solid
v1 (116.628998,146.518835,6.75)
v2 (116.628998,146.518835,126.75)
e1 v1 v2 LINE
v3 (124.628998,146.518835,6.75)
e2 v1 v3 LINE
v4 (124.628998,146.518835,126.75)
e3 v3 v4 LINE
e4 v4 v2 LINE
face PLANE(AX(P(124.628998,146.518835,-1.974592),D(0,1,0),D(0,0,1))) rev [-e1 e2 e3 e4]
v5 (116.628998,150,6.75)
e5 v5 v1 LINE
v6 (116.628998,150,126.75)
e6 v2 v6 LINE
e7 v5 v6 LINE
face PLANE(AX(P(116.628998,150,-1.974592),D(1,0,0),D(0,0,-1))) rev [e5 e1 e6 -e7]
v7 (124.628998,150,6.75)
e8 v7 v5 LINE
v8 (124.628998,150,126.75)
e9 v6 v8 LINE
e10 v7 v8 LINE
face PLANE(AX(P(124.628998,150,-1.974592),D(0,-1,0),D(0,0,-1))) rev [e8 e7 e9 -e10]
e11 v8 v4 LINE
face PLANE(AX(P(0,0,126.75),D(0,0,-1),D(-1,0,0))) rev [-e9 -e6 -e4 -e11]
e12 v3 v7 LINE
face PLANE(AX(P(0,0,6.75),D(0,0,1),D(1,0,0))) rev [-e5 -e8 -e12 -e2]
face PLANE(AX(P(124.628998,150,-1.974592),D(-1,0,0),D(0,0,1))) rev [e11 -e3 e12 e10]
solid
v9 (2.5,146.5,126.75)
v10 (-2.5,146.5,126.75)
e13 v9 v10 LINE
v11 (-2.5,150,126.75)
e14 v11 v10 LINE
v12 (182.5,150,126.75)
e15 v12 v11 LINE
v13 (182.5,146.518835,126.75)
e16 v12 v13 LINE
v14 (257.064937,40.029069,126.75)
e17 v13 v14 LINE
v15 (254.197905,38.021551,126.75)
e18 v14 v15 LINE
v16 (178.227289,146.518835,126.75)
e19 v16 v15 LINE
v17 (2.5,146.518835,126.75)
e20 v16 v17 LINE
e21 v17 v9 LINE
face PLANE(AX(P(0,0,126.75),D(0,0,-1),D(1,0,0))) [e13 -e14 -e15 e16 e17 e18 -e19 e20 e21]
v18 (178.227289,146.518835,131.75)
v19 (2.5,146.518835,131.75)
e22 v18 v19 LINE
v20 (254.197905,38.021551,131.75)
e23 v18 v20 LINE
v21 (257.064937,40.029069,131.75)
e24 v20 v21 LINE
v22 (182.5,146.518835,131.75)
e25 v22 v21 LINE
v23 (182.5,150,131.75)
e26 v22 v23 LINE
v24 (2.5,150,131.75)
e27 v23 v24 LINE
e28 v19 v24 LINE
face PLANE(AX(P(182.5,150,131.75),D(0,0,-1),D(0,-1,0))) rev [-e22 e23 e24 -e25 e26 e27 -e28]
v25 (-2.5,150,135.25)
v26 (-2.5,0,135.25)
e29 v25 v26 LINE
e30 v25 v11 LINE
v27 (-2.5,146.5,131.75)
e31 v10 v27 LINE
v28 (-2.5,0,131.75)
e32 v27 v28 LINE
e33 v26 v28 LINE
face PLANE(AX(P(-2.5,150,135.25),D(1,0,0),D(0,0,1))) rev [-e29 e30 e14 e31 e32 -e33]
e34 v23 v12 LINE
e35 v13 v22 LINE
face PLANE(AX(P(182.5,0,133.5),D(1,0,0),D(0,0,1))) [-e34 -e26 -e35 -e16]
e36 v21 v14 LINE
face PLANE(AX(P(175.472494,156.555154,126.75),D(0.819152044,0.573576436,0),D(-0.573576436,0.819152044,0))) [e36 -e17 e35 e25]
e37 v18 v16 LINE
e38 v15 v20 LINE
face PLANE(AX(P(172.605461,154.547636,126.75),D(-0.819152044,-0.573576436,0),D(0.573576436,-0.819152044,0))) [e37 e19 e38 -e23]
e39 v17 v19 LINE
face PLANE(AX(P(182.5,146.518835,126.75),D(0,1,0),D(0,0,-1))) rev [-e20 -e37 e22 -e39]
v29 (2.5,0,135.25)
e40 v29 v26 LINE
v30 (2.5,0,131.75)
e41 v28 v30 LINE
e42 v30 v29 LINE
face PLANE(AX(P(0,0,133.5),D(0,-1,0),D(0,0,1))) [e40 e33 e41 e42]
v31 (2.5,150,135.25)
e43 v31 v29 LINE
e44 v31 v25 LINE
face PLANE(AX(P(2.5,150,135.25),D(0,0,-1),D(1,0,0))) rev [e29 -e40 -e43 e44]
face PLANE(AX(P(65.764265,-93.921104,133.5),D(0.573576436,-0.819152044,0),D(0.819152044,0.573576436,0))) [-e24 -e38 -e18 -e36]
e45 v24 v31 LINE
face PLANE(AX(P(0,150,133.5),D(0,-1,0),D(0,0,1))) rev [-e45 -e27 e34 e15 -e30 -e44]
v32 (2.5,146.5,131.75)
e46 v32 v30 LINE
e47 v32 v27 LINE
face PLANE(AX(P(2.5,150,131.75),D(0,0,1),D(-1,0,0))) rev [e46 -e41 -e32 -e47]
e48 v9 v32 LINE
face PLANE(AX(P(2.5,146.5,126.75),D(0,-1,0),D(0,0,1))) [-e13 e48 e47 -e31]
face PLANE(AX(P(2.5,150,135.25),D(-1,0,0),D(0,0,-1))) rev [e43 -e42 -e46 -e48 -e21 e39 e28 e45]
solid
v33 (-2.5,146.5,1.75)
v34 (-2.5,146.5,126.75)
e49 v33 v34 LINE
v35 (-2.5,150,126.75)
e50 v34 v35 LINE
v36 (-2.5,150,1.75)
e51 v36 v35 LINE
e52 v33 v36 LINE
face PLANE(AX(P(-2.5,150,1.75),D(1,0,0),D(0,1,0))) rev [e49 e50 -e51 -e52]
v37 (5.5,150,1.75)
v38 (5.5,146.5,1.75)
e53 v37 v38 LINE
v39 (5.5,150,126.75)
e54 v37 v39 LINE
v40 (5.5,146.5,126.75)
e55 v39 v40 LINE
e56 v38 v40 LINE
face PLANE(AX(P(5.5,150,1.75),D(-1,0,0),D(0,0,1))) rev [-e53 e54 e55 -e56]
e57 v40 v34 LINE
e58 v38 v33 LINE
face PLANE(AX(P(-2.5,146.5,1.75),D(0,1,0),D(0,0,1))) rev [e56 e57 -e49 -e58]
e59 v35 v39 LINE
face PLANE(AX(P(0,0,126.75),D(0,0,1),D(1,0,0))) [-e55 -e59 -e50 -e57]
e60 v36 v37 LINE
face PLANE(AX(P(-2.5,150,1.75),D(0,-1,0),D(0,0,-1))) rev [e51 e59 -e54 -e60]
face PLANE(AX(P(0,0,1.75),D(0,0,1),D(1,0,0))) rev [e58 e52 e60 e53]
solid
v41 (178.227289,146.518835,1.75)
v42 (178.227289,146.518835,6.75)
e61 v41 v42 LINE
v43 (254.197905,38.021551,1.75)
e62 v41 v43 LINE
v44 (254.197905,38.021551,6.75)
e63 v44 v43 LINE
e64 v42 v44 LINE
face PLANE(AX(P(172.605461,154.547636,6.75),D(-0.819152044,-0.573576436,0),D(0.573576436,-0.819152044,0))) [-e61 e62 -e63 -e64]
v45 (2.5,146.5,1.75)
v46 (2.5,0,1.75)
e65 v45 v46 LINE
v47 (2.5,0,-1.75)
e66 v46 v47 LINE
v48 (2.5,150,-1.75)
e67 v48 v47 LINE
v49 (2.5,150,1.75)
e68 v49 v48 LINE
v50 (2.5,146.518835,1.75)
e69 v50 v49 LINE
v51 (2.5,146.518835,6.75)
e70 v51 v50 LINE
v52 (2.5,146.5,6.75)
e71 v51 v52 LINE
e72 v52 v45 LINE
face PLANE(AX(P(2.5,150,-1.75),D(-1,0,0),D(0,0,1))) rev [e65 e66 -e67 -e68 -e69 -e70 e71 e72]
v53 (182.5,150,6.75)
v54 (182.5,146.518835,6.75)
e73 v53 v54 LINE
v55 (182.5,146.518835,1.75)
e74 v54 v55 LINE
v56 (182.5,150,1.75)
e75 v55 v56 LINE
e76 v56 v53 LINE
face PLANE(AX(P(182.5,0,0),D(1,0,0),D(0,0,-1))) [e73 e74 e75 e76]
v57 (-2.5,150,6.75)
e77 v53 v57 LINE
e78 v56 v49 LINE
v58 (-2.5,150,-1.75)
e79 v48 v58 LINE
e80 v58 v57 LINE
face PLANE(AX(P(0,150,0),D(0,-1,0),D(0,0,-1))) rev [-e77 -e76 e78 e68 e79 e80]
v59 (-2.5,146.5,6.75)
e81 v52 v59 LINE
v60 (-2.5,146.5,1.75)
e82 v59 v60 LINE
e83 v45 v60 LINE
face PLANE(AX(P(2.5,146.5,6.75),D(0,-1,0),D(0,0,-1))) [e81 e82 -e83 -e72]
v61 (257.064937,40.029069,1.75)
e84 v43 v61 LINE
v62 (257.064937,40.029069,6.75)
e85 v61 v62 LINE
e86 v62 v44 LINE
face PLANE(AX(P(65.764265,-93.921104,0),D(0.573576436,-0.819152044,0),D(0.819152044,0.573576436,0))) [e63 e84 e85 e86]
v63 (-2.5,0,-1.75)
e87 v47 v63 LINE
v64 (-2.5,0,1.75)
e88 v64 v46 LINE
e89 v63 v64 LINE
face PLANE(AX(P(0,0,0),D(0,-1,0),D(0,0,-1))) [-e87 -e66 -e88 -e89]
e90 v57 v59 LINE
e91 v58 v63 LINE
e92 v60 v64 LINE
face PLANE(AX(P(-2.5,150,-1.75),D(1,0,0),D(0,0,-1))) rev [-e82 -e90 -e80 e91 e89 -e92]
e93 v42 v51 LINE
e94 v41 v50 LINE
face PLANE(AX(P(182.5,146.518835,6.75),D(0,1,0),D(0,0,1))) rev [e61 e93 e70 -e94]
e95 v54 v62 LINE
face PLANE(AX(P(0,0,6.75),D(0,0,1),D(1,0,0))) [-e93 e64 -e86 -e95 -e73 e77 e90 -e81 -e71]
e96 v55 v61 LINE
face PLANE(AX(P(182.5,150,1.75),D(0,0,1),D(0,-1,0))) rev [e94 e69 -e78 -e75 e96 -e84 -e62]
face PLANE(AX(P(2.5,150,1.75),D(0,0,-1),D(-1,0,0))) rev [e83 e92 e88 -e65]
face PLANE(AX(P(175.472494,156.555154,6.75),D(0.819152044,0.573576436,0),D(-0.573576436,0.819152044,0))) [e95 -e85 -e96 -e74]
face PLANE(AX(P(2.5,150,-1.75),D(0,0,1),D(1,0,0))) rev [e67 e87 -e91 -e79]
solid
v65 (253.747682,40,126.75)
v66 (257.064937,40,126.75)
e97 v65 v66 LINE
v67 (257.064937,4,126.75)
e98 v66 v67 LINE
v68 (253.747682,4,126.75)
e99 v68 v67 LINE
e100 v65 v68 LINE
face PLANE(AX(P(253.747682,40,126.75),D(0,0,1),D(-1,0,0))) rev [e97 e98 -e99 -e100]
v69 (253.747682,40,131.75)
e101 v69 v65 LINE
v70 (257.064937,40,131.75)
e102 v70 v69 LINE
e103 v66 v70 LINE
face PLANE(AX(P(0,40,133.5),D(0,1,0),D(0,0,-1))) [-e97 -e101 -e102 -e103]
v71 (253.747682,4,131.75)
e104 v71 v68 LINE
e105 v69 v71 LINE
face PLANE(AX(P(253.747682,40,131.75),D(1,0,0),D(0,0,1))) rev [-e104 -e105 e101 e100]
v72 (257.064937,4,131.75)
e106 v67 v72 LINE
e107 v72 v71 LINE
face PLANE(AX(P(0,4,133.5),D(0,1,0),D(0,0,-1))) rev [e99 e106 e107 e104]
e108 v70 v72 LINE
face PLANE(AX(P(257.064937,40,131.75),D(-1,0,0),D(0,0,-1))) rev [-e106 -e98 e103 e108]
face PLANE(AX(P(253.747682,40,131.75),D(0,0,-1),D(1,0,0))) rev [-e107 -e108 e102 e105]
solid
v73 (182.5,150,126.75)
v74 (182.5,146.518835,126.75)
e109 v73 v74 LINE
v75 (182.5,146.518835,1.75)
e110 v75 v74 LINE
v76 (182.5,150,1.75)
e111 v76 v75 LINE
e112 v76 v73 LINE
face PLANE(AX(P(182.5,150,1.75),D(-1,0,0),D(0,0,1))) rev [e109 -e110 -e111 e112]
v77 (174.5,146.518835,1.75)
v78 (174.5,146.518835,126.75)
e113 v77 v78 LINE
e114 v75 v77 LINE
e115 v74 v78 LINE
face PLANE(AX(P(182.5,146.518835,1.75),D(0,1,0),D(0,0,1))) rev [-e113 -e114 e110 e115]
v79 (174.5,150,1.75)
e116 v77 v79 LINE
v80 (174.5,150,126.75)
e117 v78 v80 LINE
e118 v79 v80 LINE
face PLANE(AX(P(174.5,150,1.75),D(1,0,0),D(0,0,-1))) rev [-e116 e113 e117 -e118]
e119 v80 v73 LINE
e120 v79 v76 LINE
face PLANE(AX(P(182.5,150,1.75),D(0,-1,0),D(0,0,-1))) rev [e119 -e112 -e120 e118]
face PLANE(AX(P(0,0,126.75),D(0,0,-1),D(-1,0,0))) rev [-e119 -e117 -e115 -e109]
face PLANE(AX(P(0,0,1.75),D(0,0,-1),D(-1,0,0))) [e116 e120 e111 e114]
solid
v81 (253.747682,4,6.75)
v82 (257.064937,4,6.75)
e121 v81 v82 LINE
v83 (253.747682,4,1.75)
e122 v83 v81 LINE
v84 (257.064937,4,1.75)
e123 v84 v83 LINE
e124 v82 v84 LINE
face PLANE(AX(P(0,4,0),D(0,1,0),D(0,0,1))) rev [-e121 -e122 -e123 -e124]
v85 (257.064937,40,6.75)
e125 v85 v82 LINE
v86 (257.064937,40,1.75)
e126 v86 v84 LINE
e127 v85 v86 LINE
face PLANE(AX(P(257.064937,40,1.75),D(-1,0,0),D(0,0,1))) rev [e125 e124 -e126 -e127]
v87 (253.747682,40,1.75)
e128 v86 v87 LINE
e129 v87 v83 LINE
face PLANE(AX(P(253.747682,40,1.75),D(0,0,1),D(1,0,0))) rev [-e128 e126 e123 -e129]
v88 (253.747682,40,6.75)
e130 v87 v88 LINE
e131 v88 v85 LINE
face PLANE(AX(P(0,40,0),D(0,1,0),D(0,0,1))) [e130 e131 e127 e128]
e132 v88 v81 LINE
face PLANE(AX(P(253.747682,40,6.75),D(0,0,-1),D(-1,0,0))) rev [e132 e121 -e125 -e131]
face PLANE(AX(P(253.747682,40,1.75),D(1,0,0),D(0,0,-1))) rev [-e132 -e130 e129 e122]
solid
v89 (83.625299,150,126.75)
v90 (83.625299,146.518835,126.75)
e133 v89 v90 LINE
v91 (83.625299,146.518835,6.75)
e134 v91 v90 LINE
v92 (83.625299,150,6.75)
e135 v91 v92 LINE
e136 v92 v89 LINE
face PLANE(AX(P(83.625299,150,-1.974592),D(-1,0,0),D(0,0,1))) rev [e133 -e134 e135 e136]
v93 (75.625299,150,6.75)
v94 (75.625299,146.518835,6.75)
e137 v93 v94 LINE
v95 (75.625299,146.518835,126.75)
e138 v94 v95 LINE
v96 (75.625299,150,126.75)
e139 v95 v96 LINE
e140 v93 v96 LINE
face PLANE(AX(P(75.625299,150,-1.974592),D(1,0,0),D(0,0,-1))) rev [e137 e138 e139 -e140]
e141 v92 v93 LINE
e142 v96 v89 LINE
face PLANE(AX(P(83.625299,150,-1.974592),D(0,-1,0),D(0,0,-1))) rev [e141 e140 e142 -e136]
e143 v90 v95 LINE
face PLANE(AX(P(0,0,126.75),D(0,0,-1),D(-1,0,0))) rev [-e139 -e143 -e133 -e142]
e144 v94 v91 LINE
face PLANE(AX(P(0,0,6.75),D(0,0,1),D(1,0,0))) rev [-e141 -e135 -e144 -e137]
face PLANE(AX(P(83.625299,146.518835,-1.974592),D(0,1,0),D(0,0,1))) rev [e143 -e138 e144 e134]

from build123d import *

# Parameters (mm, degrees)
SKETCH2_W                       = 5
SKETCH2_H                       = 3.5
BOSS_EXTRUDE1_DEPTH             = 150
SKETCH5_W                       = 5
SKETCH5_H                       = 3.5
BOSS_EXTRUDE2_DEPTH             = 5
SKETCH7_W                       = 5
SKETCH7_H                       = 3.481165415
BOSS_EXTRUDE3_DEPTH             = 180
SKETCH11_W                      = 5
SKETCH11_H                      = 3.5
BOSS_EXTRUDE4_DEPTH             = 130
BOSS_EXTRUDE4_DIRECTION_2_REACH = 237.646
BOSS_EXTRUDE14_DEPTH            = 6
BOSS_EXTRUDE14_DEPTH_BACK       = 30
SKETCH23_W                      = 3.317254227
SKETCH23_H                      = 5
MIRROR7_START                   = 126.75
MIRROR7_DEPTH                   = 5
MIRROR7_START_2                 = 131.75
MIRROR7_2_OUTLINE_W             = 5
MIRROR7_2_OUTLINE_H             = 150
MIRROR7_2_DEPTH                 = 3.5
SKETCH26_W                      = 8
SKETCH26_H                      = 3.481165415
BOSS_EXTRUDE16_DEPTH            = 125
SKETCH30_W                      = 8
SKETCH30_H                      = 3.481165415
BOSS_EXTRUDE22_DEPTH            = 120
SKETCH31_W                      = 8
SKETCH31_H                      = 3.481165415
BOSS_EXTRUDE23_DEPTH            = 120
SKETCH29_W                      = 8
SKETCH29_H                      = 3.5
BOSS_EXTRUDE26_DEPTH            = 125


# Read off the part's stored shape, not the designer's step: Mirror7
with BuildPart() as part:
    # Sketch2 → Boss-Extrude1 (new body)
    with BuildSketch(Plane(origin=(0, 0, 0), x_dir=(1, 0, 0), z_dir=(0, 1, 0))):
        Rectangle(SKETCH2_W, SKETCH2_H)
    extrude(amount=BOSS_EXTRUDE1_DEPTH)

    # Sketch5 → Boss-Extrude2 (add)
    with BuildSketch(Plane.XY.offset(1.75)):
        with Locations((0, 148.25)):
            Rectangle(SKETCH5_W, SKETCH5_H)
    extrude(amount=BOSS_EXTRUDE2_DEPTH)

    # Sketch7 → Boss-Extrude3 (add)
    with BuildSketch(Plane(origin=(2.5, 0, 0), x_dir=(0, 0, -1), z_dir=(1, 0, 0))):
        with Locations((-4.25, 148.259417293)):
            Rectangle(SKETCH7_W, SKETCH7_H)
    extrude(amount=BOSS_EXTRUDE3_DEPTH)

    # Sketch11 → Boss-Extrude4 (add)
    with BuildSketch(Plane(origin=(-8.800671911, 12.568662048, 0), x_dir=(0, 0, -1), z_dir=(0.5735764363510444, -0.819152044288993, 0))):
        with Locations((-4.25, 231.784999082)):
            Rectangle(SKETCH11_W, SKETCH11_H)
    extrude(amount=BOSS_EXTRUDE4_DEPTH)

    # Boss-Extrude4 direction 2: up to this face of the body (flat: up to its plane)
    boss_extrude4_direction_2_end = Plane(part.part.faces().sort_by_distance((88.328912467, 150, 4.171087533))[0])
    # Sketch11 → Boss-Extrude4 direction 2 (add, up to the picked face)
    with BuildSketch(Plane(origin=(-8.800671911, 12.568662048, 0), x_dir=(0, 0, -1), z_dir=(0.5735764363510444, -0.819152044288993, 0)), mode=Mode.PRIVATE) as boss_extrude4_direction_2_sk1:
        with Locations((-4.25, 231.784999082)):
            Rectangle(SKETCH11_W, SKETCH11_H)
    boss_extrude4_direction_2_tool1 = split(extrude(boss_extrude4_direction_2_sk1.sketch, amount=-BOSS_EXTRUDE4_DIRECTION_2_REACH, mode=Mode.PRIVATE), bisect_by=boss_extrude4_direction_2_end, keep=Keep.BOTH, mode=Mode.PRIVATE)
    add(boss_extrude4_direction_2_tool1.solids().sort_by(Axis((181.066484, 145.515076, 4.25), (-0.5735764363510444, 0.819152044288993, 0)))[0])


with BuildPart() as body_2:
    # Sketch23 → Boss-Extrude14 (new, two sides: drawn at the far end of the back side and taken through both)
    with BuildSketch(Plane(origin=(0, 34, 0), x_dir=(1, 0, 0), z_dir=(0, 1, 0)).offset(-BOSS_EXTRUDE14_DEPTH_BACK)):
        with Locations((255.406309613, -4.25)):
            Rectangle(SKETCH23_W, SKETCH23_H)
    extrude(amount=BOSS_EXTRUDE14_DEPTH + BOSS_EXTRUDE14_DEPTH_BACK)


with BuildPart() as body_3:
    # Mirror7 outline → Mirror7 (new body)
    with BuildSketch(Plane.XY.offset(MIRROR7_START)):
        Polygon((182.5, 150), (-2.5, 150), (-2.5, 146.5), (2.5, 146.5), (2.5, 146.518834585), (178.227288939, 146.518834585), (254.197904571, 38.0215513), (257.064936726, 40.029068827), (182.5, 146.518834585), align=None)
    extrude(amount=MIRROR7_DEPTH)

    # Mirror7 2 outline → Mirror7 2 (add)
    with BuildSketch(Plane.XY.offset(MIRROR7_START_2)):
        with Locations((0, 75)):
            Rectangle(MIRROR7_2_OUTLINE_W, MIRROR7_2_OUTLINE_H)
    extrude(amount=MIRROR7_2_DEPTH)


with BuildPart() as body_4:
    # Sketch26 → Boss-Extrude16 (new body)
    with BuildSketch(Plane(origin=(0, 0, 126.75), x_dir=(-1, 0, 0), z_dir=(0, 0, -1))):
        with Locations((-178.5, 148.259417293)):
            Rectangle(SKETCH26_W, SKETCH26_H)
    extrude(amount=BOSS_EXTRUDE16_DEPTH)


with BuildPart() as body_5:
    # Sketch30 → Boss-Extrude22 (new body)
    with BuildSketch(Plane(origin=(0, 0, 126.75), x_dir=(-1, 0, 0), z_dir=(0, 0, -1))):
        with Locations((-120.62899812, 148.259417293)):
            Rectangle(SKETCH30_W, SKETCH30_H)
    extrude(amount=BOSS_EXTRUDE22_DEPTH)


with BuildPart() as body_6:
    # Sketch31 → Boss-Extrude23 (new body)
    with BuildSketch(Plane(origin=(0, 0, 126.75), x_dir=(-1, 0, 0), z_dir=(0, 0, -1))):
        with Locations((-79.625299037, 148.259417293)):
            Rectangle(SKETCH31_W, SKETCH31_H)
    extrude(amount=BOSS_EXTRUDE23_DEPTH)


with BuildPart() as body_7:
    # Sketch29 → Boss-Extrude26 (new body)
    with BuildSketch(Plane(origin=(0, 0, 126.75), x_dir=(-1, 0, 0), z_dir=(0, 0, -1))):
        with Locations((-1.5, 148.25)):
            Rectangle(SKETCH29_W, SKETCH29_H)
    extrude(amount=BOSS_EXTRUDE26_DEPTH)


with BuildPart() as body_8:
    # Mirror8: mirrored copy
    add(body_2.part.mirror(Plane.XY.offset(66.75)))


solid = Compound([part.part, body_2.part, body_3.part, body_4.part, body_5.part, body_6.part, body_7.part, body_8.part])
